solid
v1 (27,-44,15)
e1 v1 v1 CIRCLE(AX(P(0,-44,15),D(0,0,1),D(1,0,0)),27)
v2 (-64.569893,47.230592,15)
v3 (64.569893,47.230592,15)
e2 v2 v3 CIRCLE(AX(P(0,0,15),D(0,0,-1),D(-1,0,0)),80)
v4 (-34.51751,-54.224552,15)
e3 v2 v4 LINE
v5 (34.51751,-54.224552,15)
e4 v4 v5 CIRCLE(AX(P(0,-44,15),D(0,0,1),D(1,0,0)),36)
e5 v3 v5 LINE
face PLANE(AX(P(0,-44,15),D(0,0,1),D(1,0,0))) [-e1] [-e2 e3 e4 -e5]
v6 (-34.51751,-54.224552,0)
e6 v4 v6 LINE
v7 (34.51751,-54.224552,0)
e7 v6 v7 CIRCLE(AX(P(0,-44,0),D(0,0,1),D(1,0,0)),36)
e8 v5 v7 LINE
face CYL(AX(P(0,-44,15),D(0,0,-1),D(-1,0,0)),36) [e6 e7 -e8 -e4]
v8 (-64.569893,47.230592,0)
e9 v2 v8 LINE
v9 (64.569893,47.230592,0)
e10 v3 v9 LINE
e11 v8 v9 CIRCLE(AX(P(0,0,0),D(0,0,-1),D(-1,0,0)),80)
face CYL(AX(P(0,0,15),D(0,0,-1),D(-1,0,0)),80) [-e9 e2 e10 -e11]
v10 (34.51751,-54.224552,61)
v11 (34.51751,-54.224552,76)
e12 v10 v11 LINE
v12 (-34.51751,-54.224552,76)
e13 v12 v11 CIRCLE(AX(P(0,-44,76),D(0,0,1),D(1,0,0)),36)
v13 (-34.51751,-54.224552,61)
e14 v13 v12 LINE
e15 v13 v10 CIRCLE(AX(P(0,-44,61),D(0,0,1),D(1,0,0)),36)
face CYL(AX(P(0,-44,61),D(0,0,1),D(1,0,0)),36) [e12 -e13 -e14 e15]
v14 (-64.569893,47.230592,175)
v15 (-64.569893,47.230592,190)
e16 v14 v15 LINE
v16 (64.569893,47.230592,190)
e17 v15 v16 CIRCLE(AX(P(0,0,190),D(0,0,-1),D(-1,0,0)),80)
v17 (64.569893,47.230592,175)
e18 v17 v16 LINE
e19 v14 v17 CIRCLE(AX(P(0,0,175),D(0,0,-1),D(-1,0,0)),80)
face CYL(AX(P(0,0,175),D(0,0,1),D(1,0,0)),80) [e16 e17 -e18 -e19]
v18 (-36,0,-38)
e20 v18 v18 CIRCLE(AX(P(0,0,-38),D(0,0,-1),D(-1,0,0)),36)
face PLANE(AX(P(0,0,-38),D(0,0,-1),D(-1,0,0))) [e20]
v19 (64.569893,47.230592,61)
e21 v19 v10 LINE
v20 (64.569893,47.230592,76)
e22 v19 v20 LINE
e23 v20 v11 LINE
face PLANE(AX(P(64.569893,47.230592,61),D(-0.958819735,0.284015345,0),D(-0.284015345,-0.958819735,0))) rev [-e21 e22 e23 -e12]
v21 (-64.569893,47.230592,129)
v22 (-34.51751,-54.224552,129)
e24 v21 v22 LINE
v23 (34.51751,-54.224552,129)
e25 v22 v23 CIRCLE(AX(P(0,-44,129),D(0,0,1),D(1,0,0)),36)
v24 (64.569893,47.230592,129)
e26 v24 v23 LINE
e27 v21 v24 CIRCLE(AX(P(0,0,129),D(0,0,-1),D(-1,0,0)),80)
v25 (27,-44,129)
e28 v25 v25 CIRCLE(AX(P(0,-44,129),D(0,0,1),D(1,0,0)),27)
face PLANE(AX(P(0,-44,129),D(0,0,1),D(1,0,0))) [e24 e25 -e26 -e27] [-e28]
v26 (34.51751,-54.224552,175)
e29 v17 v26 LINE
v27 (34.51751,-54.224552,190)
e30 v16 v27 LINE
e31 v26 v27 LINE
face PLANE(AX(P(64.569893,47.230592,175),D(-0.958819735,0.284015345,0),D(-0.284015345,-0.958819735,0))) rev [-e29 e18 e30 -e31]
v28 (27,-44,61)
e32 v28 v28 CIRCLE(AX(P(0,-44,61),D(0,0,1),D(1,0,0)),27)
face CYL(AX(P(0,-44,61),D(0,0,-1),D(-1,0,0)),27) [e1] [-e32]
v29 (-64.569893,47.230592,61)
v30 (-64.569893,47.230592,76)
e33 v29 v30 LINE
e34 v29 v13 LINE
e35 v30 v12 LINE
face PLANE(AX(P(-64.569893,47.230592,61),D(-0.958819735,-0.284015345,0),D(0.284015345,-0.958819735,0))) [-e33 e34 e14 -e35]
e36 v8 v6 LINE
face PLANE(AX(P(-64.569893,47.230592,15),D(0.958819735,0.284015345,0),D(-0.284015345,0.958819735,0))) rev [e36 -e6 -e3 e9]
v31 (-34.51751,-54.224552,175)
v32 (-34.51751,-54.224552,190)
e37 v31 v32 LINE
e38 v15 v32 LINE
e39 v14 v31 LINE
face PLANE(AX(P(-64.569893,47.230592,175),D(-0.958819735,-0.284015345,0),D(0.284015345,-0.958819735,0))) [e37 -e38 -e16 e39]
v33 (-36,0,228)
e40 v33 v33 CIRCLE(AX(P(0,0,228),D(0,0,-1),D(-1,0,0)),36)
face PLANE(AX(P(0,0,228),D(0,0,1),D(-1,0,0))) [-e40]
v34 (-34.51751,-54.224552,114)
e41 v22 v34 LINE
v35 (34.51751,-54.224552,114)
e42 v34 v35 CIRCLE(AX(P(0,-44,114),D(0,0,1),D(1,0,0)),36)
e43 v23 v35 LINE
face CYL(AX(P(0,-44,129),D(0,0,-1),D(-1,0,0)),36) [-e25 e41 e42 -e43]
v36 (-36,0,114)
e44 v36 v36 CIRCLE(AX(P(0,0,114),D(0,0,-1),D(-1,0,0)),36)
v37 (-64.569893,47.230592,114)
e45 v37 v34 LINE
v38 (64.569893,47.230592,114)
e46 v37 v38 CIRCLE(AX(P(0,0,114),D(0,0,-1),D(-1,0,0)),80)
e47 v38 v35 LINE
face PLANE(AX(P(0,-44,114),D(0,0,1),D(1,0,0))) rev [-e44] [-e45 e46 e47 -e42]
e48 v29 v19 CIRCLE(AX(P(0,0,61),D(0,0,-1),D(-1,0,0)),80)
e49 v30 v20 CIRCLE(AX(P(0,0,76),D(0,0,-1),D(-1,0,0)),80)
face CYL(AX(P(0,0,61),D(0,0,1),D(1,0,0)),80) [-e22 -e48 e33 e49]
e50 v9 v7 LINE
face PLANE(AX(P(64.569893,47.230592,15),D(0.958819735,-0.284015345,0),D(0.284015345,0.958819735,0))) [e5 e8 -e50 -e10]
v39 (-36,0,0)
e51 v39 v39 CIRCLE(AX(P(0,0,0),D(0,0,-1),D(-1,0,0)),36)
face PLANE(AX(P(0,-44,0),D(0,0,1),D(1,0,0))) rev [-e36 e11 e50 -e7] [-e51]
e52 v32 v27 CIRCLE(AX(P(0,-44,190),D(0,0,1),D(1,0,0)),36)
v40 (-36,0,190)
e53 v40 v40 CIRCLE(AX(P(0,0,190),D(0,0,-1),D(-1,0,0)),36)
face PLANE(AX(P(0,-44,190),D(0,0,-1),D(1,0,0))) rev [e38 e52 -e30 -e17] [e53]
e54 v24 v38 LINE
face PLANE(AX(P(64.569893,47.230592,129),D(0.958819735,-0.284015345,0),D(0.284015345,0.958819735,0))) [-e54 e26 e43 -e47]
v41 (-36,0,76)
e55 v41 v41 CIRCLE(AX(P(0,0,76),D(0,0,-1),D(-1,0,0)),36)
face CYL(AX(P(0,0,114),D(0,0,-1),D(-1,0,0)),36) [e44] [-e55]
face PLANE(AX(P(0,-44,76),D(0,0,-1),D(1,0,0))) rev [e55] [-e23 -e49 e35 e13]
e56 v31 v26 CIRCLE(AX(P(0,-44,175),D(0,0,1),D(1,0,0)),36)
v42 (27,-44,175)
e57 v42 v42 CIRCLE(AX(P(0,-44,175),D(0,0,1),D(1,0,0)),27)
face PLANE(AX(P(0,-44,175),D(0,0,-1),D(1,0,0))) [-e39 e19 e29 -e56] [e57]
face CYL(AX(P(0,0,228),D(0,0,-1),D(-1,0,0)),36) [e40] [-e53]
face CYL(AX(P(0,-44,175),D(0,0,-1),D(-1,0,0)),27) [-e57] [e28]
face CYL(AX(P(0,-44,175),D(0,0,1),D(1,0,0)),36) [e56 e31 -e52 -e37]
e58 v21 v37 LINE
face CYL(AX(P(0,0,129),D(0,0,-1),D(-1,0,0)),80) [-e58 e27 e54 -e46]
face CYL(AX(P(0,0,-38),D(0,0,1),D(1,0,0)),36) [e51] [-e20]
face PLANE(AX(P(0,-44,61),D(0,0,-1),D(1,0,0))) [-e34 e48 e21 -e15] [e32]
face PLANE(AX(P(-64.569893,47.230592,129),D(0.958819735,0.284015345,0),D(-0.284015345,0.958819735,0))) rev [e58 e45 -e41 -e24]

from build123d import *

# Parameters (mm, degrees)
BOSS_EXTRUDE2_DEPTH     = 15
SKETCH3_R               = 27
BOSS_EXTRUDE3_DEPTH     = 46
SKETCH4_R               = 36
BOSS_EXTRUDE4_DEPTH     = 38
MIRROR3_COPY_1_DEPTH    = 15
MIRROR3_COPY_2_SKETCH_R = 27
MIRROR3_COPY_2_DEPTH    = 46
MIRROR3_COPY_3_SKETCH_R = 36
MIRROR3_COPY_3_DEPTH    = 38
MIRROR3_COPY_4_DEPTH    = 15
MIRROR3_COPY_5_SKETCH_R = 27
MIRROR3_COPY_5_DEPTH    = 46
MIRROR3_COPY_6_SKETCH_R = 36
MIRROR3_COPY_6_DEPTH    = 38


with BuildPart() as part:
    # Sketch2 → Boss-Extrude2 (new body)
    with BuildSketch(Plane.XY):
        with BuildLine():
            Line((64.569893475, 47.23059238), (34.517510455, -54.224552409))
            ThreePointArc((34.517510455, -54.224552409), (0, -80), (-34.517510455, -54.224552409))
            Line((-34.517510455, -54.224552409), (-64.569893475, 47.23059238))
            ThreePointArc((-64.569893475, 47.23059238), (0, 80), (64.569893475, 47.23059238))
        make_face()
    boss_extrude2 = extrude(amount=BOSS_EXTRUDE2_DEPTH)

    # Sketch3 → Boss-Extrude3 (add)
    with BuildSketch(Plane.XY.offset(15)):
        with Locations((0, -44)):
            Circle(SKETCH3_R)
    boss_extrude3 = extrude(amount=BOSS_EXTRUDE3_DEPTH)

    # Sketch4 → Boss-Extrude4 (add)
    with BuildSketch(Plane(origin=(0, 0, 0), x_dir=(-1, 0, 0), z_dir=(0, 0, -1))):
        Circle(SKETCH4_R)
    boss_extrude4 = extrude(amount=BOSS_EXTRUDE4_DEPTH)

    # Mirror2: Boss-Extrude2, Boss-Extrude3, Boss-Extrude4 across plane
    add(boss_extrude2.mirror(Plane.XY.offset(38)))
    add(boss_extrude3.mirror(Plane.XY.offset(38)))
    add(boss_extrude4.mirror(Plane.XY.offset(38)))

    # Mirror3 copy 1 sketch → Mirror3 copy 1 (add)
    with BuildSketch(Plane.XY.offset(114)):
        with BuildLine():
            Line((64.569893475, 47.23059238), (34.517510455, -54.224552409))
            ThreePointArc((34.517510455, -54.224552409), (0, -80), (-34.517510455, -54.224552409))
            Line((-34.517510455, -54.224552409), (-64.569893475, 47.23059238))
            ThreePointArc((-64.569893475, 47.23059238), (0, 80), (64.569893475, 47.23059238))
        make_face()
    extrude(amount=MIRROR3_COPY_1_DEPTH)

    # Mirror3 copy 2 sketch → Mirror3 copy 2 (add)
    with BuildSketch(Plane.XY.offset(129)):
        with Locations((0, -44)):
            Circle(MIRROR3_COPY_2_SKETCH_R)
    extrude(amount=MIRROR3_COPY_2_DEPTH)

    # Mirror3 copy 3 sketch → Mirror3 copy 3 (add)
    with BuildSketch(Plane(origin=(0, 0, 114), x_dir=(-1, 0, 0), z_dir=(0, 0, -1))):
        Circle(MIRROR3_COPY_3_SKETCH_R)
    extrude(amount=MIRROR3_COPY_3_DEPTH)

    # Mirror3 copy 4 sketch → Mirror3 copy 4 (add)
    with BuildSketch(Plane(origin=(0, 0, 190), x_dir=(1, 0, 0), z_dir=(0, 0, -1))):
        with BuildLine():
            Line((64.569893475, -47.23059238), (34.517510455, 54.224552409))
            ThreePointArc((34.517510455, 54.224552409), (0, 80), (-34.517510455, 54.224552409))
            Line((-34.517510455, 54.224552409), (-64.569893475, -47.23059238))
            ThreePointArc((-64.569893475, -47.23059238), (0, -80), (64.569893475, -47.23059238))
        make_face()
    extrude(amount=MIRROR3_COPY_4_DEPTH)

    # Mirror3 copy 5 sketch → Mirror3 copy 5 (add)
    with BuildSketch(Plane(origin=(0, 0, 175), x_dir=(1, 0, 0), z_dir=(0, 0, -1))):
        with Locations((0, 44)):
            Circle(MIRROR3_COPY_5_SKETCH_R)
    extrude(amount=MIRROR3_COPY_5_DEPTH)

    # Mirror3 copy 6 sketch → Mirror3 copy 6 (add)
    with BuildSketch(Plane(origin=(0, 0, 190), x_dir=(-1, 0, 0), z_dir=(0, 0, 1))):
        Circle(MIRROR3_COPY_6_SKETCH_R)
    extrude(amount=MIRROR3_COPY_6_DEPTH)


solid = part.part
